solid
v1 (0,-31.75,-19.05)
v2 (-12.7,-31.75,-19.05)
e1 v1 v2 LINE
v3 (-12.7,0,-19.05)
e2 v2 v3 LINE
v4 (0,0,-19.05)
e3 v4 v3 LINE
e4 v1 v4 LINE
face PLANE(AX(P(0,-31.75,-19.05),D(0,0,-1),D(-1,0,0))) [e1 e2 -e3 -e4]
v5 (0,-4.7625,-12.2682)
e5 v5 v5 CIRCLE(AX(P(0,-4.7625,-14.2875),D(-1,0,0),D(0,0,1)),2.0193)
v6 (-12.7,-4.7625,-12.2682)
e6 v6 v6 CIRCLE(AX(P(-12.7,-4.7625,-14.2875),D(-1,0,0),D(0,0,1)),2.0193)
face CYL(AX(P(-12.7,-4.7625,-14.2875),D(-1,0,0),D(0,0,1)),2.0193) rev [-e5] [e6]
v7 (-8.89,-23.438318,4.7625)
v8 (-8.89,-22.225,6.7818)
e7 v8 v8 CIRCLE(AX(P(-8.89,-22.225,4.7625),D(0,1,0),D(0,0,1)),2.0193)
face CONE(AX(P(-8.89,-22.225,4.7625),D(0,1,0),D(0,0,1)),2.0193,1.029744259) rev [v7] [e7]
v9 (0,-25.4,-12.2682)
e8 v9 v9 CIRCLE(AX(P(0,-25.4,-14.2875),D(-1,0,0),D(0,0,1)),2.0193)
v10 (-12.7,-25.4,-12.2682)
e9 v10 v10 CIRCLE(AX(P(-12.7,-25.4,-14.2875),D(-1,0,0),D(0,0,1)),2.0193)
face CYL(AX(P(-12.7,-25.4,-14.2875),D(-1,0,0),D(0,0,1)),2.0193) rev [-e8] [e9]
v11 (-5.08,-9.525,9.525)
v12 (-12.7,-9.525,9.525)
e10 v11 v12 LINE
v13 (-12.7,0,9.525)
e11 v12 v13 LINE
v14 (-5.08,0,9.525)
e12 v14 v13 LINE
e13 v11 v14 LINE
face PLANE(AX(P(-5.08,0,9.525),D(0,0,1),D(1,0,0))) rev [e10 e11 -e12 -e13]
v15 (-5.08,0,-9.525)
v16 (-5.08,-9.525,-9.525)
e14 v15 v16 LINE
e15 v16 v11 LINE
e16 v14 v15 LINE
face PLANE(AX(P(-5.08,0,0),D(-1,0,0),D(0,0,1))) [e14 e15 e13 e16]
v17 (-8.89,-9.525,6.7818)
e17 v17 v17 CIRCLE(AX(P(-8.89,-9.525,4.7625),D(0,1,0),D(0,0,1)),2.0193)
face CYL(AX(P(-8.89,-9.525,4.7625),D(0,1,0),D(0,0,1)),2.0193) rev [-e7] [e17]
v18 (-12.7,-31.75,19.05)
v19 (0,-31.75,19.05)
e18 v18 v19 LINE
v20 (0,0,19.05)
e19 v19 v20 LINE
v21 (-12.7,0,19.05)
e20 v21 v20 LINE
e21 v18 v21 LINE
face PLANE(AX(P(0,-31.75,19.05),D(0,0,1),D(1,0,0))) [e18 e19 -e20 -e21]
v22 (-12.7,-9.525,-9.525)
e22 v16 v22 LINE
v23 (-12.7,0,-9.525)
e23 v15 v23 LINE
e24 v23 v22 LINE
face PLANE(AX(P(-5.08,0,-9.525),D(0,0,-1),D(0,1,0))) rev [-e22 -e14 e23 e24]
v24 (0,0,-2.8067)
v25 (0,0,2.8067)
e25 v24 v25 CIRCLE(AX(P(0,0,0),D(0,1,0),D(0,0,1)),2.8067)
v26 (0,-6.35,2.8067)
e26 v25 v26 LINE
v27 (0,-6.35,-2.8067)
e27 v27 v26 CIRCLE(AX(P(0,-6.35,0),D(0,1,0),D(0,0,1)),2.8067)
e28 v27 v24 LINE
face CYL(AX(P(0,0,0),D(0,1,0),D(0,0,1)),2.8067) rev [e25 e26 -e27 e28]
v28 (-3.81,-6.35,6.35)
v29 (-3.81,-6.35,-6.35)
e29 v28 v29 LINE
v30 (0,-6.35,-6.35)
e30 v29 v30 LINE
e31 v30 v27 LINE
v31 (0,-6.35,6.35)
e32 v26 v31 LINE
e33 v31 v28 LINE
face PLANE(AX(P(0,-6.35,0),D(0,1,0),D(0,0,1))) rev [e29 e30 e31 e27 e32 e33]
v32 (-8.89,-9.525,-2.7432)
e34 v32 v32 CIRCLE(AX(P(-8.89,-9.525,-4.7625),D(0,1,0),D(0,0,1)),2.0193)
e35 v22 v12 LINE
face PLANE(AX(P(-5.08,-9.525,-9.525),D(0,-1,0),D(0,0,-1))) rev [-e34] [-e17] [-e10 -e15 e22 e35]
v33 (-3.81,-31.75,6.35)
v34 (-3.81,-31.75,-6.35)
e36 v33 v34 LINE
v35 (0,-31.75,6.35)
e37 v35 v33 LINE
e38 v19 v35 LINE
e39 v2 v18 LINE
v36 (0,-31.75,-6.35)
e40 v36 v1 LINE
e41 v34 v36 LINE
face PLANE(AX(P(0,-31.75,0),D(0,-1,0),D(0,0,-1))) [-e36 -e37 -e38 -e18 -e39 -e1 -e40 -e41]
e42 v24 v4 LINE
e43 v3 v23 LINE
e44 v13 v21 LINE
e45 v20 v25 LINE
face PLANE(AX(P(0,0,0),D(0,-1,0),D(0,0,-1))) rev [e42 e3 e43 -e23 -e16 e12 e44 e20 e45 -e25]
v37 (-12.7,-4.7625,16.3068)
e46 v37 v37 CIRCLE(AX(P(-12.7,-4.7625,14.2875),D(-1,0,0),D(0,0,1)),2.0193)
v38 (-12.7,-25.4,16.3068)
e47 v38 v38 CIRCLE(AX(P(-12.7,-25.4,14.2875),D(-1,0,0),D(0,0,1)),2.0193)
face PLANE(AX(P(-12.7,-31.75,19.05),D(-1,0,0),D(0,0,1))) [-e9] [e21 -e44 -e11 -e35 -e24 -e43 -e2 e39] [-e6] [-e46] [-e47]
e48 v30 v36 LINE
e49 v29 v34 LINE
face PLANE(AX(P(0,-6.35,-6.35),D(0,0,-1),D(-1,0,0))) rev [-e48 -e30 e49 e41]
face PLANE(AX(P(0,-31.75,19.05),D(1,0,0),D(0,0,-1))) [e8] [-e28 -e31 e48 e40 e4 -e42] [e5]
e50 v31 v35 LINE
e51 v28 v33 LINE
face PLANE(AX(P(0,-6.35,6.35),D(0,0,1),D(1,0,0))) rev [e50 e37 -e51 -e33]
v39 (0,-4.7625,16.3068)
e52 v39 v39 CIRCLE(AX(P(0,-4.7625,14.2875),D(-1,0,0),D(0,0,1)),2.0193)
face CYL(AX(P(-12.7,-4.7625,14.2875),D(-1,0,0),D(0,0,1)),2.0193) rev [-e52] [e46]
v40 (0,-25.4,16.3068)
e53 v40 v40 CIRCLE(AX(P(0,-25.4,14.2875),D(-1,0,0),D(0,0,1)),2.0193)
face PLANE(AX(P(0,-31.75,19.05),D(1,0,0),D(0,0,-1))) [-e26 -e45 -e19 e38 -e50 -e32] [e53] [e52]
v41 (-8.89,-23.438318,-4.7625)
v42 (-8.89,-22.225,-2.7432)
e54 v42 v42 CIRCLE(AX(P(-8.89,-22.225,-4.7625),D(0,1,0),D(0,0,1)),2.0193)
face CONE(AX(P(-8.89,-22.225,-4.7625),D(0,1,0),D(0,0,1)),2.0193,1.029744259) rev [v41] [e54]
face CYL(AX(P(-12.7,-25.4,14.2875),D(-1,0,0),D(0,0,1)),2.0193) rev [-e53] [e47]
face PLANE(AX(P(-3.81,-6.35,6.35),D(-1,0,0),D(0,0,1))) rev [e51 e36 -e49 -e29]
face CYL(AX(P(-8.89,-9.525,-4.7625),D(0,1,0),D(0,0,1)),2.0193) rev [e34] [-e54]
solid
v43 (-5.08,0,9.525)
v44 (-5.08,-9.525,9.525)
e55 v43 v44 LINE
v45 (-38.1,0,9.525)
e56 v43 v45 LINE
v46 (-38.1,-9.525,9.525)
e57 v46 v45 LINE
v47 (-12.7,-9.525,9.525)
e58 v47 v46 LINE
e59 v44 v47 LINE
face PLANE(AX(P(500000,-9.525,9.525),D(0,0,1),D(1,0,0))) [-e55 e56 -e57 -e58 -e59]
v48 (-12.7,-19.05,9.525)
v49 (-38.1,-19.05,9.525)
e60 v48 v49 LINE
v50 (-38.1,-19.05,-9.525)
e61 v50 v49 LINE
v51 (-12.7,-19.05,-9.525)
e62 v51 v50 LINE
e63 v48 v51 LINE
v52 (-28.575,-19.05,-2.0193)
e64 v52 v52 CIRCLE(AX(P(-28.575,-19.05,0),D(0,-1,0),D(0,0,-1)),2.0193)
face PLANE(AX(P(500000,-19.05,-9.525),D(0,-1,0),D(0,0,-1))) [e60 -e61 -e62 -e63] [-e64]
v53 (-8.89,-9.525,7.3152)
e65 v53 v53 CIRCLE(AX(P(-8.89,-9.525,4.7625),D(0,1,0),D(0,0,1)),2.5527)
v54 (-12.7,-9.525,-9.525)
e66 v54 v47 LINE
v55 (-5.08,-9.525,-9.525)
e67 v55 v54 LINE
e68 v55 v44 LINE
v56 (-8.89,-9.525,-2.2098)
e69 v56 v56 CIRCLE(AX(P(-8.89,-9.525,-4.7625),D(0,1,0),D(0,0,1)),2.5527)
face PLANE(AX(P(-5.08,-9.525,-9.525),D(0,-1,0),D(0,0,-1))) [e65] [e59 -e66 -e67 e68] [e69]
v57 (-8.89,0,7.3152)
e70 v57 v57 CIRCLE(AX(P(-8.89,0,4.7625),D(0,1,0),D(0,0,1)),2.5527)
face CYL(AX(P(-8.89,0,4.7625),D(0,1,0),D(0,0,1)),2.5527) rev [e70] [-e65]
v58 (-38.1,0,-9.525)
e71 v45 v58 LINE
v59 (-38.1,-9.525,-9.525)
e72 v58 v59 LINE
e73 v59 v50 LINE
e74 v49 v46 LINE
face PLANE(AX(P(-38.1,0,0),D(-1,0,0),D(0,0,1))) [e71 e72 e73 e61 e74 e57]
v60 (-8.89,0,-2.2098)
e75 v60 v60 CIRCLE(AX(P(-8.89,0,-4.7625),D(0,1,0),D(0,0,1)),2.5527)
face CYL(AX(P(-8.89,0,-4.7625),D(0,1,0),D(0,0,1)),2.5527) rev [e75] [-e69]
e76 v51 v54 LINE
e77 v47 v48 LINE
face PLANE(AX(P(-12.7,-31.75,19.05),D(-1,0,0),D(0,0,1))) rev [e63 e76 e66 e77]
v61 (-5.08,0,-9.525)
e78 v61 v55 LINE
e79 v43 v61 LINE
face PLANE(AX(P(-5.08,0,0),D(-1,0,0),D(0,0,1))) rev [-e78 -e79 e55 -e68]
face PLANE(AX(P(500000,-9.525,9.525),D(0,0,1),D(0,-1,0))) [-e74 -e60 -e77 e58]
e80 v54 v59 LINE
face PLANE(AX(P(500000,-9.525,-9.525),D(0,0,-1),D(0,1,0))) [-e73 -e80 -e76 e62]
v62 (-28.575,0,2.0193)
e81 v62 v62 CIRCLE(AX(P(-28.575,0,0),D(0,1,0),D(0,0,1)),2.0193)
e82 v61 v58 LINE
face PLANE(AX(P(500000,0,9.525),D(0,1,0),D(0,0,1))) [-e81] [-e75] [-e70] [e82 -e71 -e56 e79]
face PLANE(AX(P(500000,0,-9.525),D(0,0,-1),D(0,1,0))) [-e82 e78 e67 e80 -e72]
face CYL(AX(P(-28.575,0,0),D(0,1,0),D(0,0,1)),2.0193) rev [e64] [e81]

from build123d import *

# Parameters (mm, degrees)
SKETCH2_W                          = 12.7
SKETCH2_H                          = 38.1
BOSS_EXTRUDE1_DEPTH                = 31.75
SKETCH8_W                          = 3.81
SKETCH8_H                          = 12.7
CUT_EXTRUDE2_DEPTH                 = 25.4
F_10_CLEARANCE_HOLE2_D             = 5.6134
F_10_32_TAPPED_HOLE1_D             = 4.0386
SKETCH11_W                         = 19.05
SKETCH11_H                         = 9.525
CUT_EXTRUDE3_DEPTH                 = 7.62
F_10_32_TAPPED_HOLE4_D             = 4.0386
F_10_32_TAPPED_HOLE4_DEPTH         = 12.7
F_10_32_TAPPED_HOLE4_TIP           = 1.213317848
BOSS_EXTRUDE4_REACH                = 55.128
SKETCH15_W                         = 2.0193
SKETCH15_H                         = 31.75
F_10_START                         = -19.05
F_10_CLEARANCE_HOLE4_OUTLINE_R     = 2.0193
F_10_CLEARANCE_HOLE4_DEPTH         = 19.05
F_10_START_2                       = -9.525
F_10_CLEARANCE_HOLE4_2_OUTLINE_R   = 2.5527
F_10_CLEARANCE_HOLE4_2_OUTLINE_R_2 = 2.0193
F_10_CLEARANCE_HOLE4_2_DEPTH       = 9.525


# Read off the part's stored shape, not the designer's step: #10 Clearance Hole4
with BuildPart() as part:
    # Sketch2 → Boss-Extrude1 (new body)
    with BuildSketch(Plane(origin=(0, 0, 0), x_dir=(1, 0, 0), z_dir=(0, 1, 0))):
        with Locations((-6.35, 0)):
            Rectangle(SKETCH2_W, SKETCH2_H)
    extrude(amount=-BOSS_EXTRUDE1_DEPTH)

    # Sketch8 → Cut-Extrude2 (cut)
    with BuildSketch(Plane.XZ.offset(31.75)):
        with Locations((-1.905, 0)):
            Rectangle(SKETCH8_W, SKETCH8_H)
    extrude(amount=-CUT_EXTRUDE2_DEPTH, mode=Mode.SUBTRACT)

    # #10 Clearance Hole2 (through all)
    with Locations(Plane(origin=(0, 0, 0), x_dir=(1, 0, 0), z_dir=(0, 1, 0))):
        with Locations((0, 0)):
            Hole(F_10_CLEARANCE_HOLE2_D / 2)

    # #10-32 Tapped Hole1 (through all)
    with Locations(Plane.ZY.offset(12.7)):
        with Locations((14.2875, -4.7625), (14.2875, -25.4), (-14.2875, -25.4), (-14.2875, -4.7625)):
            Hole(F_10_32_TAPPED_HOLE1_D / 2)

    # Sketch11 → Cut-Extrude3 (cut)
    with BuildSketch(Plane.ZY.offset(12.7)):
        with Locations((0, -4.7625)):
            Rectangle(SKETCH11_W, SKETCH11_H)
    extrude(amount=-CUT_EXTRUDE3_DEPTH, mode=Mode.SUBTRACT)

    # #10-32 Tapped Hole4
    with Locations(Plane(origin=(0, -9.525, 0), x_dir=(1, 0, 0), z_dir=(0, 1, 0))):
        with Locations((-8.89, 4.7625), (-8.89, -4.7625)):
            Hole(F_10_32_TAPPED_HOLE4_D / 2, depth=F_10_32_TAPPED_HOLE4_DEPTH)
            with Locations((0, 0, -(F_10_32_TAPPED_HOLE4_DEPTH + F_10_32_TAPPED_HOLE4_TIP / 2))):  # 118° drill point
                Cone(0, F_10_32_TAPPED_HOLE4_D / 2, F_10_32_TAPPED_HOLE4_TIP, mode=Mode.SUBTRACT)


with BuildPart() as body_2:

    # Sketch20 → Boss-Extrude4 (new, up to next)
    with BuildSketch(Plane.ZY.offset(38.1), mode=Mode.PRIVATE) as boss_extrude4_sk1:
        Polygon((-9.525, -9.525), (-9.525, -19.05), (9.525, -19.05), (9.525, -9.525), (9.525, 0), (-9.525, 0), align=None)
    boss_extrude4_tool1 = extrude(boss_extrude4_sk1.sketch, amount=-BOSS_EXTRUDE4_REACH, mode=Mode.PRIVATE) - part.part
    add(boss_extrude4_tool1.solids().sort_by_distance((-38.1, -9.525, 0))[0])

    # Sketch15 → #10-32 Tapped Hole2 (revolve, cut)
    with BuildSketch(Plane(origin=(-28.575, 0, 0), x_dir=(0, 0, 1), z_dir=(1, 0, 0))):
        with Locations((1.00965, 15.875)):
            Rectangle(SKETCH15_W, SKETCH15_H)
    revolve(axis=Axis((-28.575, 6.35, 0), (0, -1, 0)), mode=Mode.SUBTRACT)

    # #10 Clearance Hole4 outline → #10 Clearance Hole4 (cut)
    with BuildSketch(Plane(origin=(0, 0, 0), x_dir=(1, 0, 0), z_dir=(0, 1, 0)).offset(F_10_START)):
        with Locations((-8.89, 4.7625)):
            Circle(F_10_CLEARANCE_HOLE4_OUTLINE_R)
        with Locations((-8.89, -4.7625)):
            Circle(F_10_CLEARANCE_HOLE4_OUTLINE_R)
    extrude(amount=F_10_CLEARANCE_HOLE4_DEPTH, mode=Mode.SUBTRACT)

    # 10 Clearance Hole4 2 outline → 10 Clearance Hole4 2 (cut)
    # profile 1 of 2: a face of its own
    with BuildSketch(Plane(origin=(0, 0, 0), x_dir=(1, 0, 0), z_dir=(0, 1, 0)).offset(F_10_START_2)):
        with Locations((-8.89, 4.7625)):
            Circle(F_10_CLEARANCE_HOLE4_2_OUTLINE_R)
        with Locations((-8.89, 4.7625)):
            Circle(F_10_CLEARANCE_HOLE4_2_OUTLINE_R_2, mode=Mode.SUBTRACT)
    # profile 2 of 2: a face of its own
    with BuildSketch(Plane(origin=(0, 0, 0), x_dir=(1, 0, 0), z_dir=(0, 1, 0)).offset(F_10_START_2)):
        with Locations((-8.89, -4.7625)):
            Circle(F_10_CLEARANCE_HOLE4_2_OUTLINE_R)
        with Locations((-8.89, -4.7625)):
            Circle(F_10_CLEARANCE_HOLE4_2_OUTLINE_R_2, mode=Mode.SUBTRACT)
    extrude(amount=F_10_CLEARANCE_HOLE4_2_DEPTH, mode=Mode.SUBTRACT)


solid = Compound([part.part, body_2.part])
